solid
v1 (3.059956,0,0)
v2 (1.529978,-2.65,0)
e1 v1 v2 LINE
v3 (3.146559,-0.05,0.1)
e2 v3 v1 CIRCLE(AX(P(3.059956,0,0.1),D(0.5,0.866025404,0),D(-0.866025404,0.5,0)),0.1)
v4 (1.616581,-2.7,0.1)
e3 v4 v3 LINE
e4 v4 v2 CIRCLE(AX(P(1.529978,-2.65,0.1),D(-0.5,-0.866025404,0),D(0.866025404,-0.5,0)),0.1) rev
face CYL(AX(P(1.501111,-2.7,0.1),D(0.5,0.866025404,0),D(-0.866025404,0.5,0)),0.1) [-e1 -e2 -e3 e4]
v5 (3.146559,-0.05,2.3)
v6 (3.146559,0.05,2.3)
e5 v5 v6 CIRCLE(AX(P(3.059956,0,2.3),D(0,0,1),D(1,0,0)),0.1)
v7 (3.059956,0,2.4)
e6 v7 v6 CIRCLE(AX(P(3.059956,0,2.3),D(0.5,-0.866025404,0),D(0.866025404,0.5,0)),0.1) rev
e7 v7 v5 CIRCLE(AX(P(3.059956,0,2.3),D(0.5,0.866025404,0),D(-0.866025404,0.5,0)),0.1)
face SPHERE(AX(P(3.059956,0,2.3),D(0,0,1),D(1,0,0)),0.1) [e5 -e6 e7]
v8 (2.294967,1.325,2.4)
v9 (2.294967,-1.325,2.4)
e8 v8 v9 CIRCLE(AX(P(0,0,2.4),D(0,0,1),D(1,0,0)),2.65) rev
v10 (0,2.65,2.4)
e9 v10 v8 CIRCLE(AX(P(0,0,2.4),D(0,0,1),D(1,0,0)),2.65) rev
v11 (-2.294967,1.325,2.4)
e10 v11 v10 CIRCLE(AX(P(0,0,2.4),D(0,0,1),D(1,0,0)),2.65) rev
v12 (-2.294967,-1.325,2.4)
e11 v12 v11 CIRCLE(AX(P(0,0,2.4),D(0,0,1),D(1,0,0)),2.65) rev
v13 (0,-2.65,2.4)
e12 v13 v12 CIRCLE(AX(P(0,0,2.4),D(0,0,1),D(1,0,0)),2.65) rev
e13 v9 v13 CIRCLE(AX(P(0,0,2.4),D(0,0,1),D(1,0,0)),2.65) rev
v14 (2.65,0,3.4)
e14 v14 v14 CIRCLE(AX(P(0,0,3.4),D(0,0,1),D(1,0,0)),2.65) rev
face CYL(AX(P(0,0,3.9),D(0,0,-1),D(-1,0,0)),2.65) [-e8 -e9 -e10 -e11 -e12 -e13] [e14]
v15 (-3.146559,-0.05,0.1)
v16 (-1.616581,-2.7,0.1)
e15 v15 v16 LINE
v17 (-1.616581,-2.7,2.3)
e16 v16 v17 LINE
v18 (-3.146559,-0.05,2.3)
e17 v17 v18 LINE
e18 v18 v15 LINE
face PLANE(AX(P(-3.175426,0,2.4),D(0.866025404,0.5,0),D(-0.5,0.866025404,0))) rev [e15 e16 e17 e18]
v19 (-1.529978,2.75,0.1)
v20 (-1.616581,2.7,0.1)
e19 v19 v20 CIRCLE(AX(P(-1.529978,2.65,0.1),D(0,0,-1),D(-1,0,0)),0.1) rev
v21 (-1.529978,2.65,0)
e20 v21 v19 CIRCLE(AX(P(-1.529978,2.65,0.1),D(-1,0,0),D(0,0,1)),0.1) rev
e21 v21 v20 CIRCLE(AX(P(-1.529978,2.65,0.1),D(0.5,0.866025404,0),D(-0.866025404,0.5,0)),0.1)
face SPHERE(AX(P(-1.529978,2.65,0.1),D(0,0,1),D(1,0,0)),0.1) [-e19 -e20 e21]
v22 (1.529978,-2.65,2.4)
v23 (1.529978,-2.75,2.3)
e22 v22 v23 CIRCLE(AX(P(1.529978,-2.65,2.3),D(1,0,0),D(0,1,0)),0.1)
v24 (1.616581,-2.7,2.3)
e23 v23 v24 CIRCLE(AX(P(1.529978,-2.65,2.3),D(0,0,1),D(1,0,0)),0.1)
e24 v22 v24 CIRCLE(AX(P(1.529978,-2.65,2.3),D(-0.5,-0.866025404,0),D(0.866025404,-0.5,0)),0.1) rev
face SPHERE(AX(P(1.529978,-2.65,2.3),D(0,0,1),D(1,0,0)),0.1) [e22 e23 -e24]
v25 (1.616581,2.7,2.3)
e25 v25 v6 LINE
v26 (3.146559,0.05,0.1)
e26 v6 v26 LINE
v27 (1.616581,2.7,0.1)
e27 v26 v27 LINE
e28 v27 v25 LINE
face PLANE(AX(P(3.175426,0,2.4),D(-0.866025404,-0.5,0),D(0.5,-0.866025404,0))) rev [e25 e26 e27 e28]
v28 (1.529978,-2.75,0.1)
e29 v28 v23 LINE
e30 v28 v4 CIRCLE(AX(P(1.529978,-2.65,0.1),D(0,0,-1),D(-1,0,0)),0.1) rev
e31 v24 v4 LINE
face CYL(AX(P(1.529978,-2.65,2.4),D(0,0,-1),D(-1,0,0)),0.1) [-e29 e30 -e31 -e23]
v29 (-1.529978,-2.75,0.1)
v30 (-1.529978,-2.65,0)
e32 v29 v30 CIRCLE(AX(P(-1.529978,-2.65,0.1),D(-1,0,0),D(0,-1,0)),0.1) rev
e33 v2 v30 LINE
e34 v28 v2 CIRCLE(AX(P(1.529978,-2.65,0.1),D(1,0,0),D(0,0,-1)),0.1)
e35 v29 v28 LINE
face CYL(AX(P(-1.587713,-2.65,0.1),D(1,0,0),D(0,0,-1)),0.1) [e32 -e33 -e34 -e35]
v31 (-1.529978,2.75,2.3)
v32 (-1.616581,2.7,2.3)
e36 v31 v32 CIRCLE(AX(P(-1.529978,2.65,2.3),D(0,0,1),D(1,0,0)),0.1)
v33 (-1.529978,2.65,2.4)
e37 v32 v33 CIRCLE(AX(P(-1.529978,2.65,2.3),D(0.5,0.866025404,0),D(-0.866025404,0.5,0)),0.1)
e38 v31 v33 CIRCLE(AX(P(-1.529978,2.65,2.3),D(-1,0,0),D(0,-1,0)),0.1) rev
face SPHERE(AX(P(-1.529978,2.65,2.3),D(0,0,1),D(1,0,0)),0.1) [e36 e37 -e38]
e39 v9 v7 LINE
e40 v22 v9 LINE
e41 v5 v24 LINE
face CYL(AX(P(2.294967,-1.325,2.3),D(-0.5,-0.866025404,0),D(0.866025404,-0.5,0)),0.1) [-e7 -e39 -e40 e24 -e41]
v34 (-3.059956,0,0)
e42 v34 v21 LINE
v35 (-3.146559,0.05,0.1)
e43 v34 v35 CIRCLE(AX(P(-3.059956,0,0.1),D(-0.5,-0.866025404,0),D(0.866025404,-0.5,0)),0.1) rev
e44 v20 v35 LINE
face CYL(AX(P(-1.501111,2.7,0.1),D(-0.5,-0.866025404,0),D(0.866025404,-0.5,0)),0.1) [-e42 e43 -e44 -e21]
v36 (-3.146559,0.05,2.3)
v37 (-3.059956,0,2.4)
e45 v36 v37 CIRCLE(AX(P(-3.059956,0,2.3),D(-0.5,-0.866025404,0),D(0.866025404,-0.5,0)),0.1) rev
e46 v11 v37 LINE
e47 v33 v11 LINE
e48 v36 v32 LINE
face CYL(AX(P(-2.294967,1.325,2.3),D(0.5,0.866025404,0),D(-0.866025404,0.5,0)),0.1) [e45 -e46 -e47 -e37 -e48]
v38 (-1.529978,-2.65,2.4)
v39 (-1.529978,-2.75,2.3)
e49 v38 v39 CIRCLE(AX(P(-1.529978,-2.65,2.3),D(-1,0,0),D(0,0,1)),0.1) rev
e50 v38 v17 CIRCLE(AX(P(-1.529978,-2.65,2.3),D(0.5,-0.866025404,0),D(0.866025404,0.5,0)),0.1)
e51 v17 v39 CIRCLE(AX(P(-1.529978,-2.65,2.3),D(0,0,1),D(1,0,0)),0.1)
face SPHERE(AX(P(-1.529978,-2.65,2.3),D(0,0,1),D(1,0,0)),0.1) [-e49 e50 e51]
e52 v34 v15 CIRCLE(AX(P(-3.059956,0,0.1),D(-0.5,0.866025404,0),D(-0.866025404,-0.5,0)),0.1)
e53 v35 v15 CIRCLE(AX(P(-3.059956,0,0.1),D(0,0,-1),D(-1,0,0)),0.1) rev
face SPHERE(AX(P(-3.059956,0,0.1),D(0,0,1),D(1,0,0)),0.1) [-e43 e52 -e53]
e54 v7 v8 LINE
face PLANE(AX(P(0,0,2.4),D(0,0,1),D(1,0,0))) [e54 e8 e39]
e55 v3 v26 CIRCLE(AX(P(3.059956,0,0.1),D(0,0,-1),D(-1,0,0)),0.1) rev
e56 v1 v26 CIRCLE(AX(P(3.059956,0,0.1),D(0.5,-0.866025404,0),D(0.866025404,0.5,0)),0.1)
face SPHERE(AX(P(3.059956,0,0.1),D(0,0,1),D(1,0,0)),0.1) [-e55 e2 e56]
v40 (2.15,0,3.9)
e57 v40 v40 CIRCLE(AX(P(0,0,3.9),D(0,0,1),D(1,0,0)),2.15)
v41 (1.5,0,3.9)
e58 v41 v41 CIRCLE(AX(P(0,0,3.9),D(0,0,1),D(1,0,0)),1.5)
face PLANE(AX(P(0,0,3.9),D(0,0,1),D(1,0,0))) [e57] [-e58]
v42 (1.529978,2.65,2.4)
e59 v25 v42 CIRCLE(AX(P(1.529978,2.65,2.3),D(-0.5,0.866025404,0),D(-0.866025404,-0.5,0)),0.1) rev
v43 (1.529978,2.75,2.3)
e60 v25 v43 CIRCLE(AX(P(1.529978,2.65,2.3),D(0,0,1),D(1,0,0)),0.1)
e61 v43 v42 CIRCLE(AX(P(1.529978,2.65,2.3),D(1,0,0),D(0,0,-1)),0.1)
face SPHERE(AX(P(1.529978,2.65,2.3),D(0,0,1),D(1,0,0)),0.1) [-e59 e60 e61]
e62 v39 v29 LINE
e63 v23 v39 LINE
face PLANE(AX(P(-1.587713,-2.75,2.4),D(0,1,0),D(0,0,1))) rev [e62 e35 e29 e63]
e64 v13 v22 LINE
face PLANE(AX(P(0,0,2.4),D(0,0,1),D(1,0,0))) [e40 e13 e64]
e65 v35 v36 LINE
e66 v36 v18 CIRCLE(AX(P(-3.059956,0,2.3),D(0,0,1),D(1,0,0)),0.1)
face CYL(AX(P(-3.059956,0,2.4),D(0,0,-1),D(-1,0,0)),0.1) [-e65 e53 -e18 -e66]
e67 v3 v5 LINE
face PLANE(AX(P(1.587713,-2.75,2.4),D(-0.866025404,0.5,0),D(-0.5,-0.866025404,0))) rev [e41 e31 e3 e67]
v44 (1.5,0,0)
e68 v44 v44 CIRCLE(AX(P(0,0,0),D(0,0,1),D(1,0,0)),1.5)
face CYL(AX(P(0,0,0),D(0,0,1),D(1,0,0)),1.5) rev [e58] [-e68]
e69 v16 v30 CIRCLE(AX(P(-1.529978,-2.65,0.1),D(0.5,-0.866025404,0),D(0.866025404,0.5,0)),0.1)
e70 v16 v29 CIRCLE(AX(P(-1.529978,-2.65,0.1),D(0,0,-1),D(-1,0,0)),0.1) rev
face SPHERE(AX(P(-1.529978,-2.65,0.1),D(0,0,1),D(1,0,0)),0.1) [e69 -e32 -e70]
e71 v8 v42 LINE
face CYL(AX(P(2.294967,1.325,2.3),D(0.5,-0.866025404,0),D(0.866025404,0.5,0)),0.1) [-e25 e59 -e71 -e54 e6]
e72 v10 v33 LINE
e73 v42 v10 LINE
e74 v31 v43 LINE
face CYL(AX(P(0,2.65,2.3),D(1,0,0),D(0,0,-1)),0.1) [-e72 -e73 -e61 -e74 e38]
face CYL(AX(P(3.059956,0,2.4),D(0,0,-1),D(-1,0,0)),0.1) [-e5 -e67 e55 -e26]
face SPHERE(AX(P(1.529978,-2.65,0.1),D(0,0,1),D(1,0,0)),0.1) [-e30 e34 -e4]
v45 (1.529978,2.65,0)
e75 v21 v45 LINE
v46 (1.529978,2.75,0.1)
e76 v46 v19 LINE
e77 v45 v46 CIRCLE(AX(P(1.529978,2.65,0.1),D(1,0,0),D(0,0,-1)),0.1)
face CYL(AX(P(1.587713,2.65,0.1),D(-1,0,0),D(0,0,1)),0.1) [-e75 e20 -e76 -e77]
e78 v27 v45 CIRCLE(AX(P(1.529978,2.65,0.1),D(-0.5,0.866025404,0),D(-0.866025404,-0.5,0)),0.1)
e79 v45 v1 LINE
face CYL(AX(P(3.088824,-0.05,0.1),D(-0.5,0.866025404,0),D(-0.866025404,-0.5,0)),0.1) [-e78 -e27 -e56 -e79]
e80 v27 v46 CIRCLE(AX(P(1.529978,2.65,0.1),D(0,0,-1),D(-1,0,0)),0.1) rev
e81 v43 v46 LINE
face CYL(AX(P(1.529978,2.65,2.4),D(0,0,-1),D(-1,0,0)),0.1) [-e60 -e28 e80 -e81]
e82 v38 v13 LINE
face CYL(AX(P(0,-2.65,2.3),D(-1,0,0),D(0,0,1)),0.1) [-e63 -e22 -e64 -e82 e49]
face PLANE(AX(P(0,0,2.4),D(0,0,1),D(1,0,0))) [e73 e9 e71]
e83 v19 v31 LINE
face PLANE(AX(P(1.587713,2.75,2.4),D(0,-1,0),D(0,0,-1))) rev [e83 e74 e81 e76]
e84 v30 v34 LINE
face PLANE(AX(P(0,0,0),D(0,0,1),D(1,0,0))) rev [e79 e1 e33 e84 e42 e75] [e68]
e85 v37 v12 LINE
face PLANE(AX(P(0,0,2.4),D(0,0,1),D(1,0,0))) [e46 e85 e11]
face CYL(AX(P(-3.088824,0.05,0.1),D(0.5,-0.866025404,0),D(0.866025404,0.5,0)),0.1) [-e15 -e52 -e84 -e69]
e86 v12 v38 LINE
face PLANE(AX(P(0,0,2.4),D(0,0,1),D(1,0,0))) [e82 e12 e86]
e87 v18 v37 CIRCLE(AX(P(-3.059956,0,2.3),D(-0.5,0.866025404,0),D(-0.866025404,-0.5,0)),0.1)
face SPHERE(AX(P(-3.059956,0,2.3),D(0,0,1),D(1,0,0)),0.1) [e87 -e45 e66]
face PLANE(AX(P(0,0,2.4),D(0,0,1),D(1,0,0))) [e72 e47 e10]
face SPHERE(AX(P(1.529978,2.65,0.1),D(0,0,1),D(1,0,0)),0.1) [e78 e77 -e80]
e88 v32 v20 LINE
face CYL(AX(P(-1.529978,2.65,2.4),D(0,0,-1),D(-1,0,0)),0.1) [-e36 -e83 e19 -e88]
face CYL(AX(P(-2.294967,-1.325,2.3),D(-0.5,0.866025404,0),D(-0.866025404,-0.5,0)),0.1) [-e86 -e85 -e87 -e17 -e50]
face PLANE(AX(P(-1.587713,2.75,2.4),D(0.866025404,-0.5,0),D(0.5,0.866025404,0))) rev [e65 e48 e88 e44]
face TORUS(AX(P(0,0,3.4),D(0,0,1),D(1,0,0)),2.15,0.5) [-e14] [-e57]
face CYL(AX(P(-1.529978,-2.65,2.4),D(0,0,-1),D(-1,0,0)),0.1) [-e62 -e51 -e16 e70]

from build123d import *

# Parameters (mm, degrees)
EXTRUDE_1_DEPTH     = 2.4
EXTRUDE_START       = -2.4
SKETCH_2_R          = 2.65
EXTRUDE_2_DEPTH     = 3.9
FILLET_1_R          = 0.5
FILLET_2_R          = 0.1
SKETCH_3_R          = 1.5
CUT_EXTRUDE_1_DEPTH = 6.723453712


with BuildPart() as part:
    # 草图1 → 凸台-拉伸1 (new body)
    with BuildSketch(Plane.XY):
        Polygon((3.175426481, 0), (1.58771324, 2.75), (-1.58771324, 2.75), (-3.175426481, 0), (-1.58771324, -2.75), (1.58771324, -2.75), align=None)
    extrude(amount=EXTRUDE_1_DEPTH)

    # 草图2 → 凸台-拉伸2 (add)
    with BuildSketch(Plane.XY.offset(2.4).offset(EXTRUDE_START)):
        Circle(SKETCH_2_R)
    extrude(amount=EXTRUDE_2_DEPTH)

    # 圆角1
    fillet_1_edges = [part.edges().sort_by_distance(p)[0] for p in [
        (-2.65, 0, 3.9),
    ]]
    fillet(fillet_1_edges, radius=FILLET_1_R)

    # 圆角2
    fillet_2_edges = [part.edges().sort_by_distance(p)[0] for p in [
        (0, 2.75, 2.4),
        (1.58771324, -2.75, 1.2),
        (-1.58771324, -2.75, 1.2),
        (-3.175426481, 0, 1.2),
        (-1.58771324, 2.75, 1.2),
        (1.58771324, 2.75, 1.2),
        (3.175426481, 0, 1.2),
        (-2.38156986, 1.375, 2.4),
        (-2.38156986, -1.375, 2.4),
        (0, -2.75, 2.4),
        (2.38156986, -1.375, 2.4),
        (0, -2.75, 0),
        (-2.38156986, -1.375, 0),
        (-2.38156986, 1.375, 0),
        (2.38156986, 1.375, 2.4),
        (0, 2.75, 0),
        (2.38156986, 1.375, 0),
        (2.38156986, -1.375, 0),
    ]]
    fillet(fillet_2_edges, radius=FILLET_2_R - 0.0001)  # a hair under: the kernel refuses the full size

    # 草图3 → 切除-拉伸1 (cut, through all)
    with BuildSketch(Plane.XY.offset(3.9)):
        Circle(SKETCH_3_R)
    extrude(amount=-CUT_EXTRUDE_1_DEPTH, mode=Mode.SUBTRACT)


solid = part.part
